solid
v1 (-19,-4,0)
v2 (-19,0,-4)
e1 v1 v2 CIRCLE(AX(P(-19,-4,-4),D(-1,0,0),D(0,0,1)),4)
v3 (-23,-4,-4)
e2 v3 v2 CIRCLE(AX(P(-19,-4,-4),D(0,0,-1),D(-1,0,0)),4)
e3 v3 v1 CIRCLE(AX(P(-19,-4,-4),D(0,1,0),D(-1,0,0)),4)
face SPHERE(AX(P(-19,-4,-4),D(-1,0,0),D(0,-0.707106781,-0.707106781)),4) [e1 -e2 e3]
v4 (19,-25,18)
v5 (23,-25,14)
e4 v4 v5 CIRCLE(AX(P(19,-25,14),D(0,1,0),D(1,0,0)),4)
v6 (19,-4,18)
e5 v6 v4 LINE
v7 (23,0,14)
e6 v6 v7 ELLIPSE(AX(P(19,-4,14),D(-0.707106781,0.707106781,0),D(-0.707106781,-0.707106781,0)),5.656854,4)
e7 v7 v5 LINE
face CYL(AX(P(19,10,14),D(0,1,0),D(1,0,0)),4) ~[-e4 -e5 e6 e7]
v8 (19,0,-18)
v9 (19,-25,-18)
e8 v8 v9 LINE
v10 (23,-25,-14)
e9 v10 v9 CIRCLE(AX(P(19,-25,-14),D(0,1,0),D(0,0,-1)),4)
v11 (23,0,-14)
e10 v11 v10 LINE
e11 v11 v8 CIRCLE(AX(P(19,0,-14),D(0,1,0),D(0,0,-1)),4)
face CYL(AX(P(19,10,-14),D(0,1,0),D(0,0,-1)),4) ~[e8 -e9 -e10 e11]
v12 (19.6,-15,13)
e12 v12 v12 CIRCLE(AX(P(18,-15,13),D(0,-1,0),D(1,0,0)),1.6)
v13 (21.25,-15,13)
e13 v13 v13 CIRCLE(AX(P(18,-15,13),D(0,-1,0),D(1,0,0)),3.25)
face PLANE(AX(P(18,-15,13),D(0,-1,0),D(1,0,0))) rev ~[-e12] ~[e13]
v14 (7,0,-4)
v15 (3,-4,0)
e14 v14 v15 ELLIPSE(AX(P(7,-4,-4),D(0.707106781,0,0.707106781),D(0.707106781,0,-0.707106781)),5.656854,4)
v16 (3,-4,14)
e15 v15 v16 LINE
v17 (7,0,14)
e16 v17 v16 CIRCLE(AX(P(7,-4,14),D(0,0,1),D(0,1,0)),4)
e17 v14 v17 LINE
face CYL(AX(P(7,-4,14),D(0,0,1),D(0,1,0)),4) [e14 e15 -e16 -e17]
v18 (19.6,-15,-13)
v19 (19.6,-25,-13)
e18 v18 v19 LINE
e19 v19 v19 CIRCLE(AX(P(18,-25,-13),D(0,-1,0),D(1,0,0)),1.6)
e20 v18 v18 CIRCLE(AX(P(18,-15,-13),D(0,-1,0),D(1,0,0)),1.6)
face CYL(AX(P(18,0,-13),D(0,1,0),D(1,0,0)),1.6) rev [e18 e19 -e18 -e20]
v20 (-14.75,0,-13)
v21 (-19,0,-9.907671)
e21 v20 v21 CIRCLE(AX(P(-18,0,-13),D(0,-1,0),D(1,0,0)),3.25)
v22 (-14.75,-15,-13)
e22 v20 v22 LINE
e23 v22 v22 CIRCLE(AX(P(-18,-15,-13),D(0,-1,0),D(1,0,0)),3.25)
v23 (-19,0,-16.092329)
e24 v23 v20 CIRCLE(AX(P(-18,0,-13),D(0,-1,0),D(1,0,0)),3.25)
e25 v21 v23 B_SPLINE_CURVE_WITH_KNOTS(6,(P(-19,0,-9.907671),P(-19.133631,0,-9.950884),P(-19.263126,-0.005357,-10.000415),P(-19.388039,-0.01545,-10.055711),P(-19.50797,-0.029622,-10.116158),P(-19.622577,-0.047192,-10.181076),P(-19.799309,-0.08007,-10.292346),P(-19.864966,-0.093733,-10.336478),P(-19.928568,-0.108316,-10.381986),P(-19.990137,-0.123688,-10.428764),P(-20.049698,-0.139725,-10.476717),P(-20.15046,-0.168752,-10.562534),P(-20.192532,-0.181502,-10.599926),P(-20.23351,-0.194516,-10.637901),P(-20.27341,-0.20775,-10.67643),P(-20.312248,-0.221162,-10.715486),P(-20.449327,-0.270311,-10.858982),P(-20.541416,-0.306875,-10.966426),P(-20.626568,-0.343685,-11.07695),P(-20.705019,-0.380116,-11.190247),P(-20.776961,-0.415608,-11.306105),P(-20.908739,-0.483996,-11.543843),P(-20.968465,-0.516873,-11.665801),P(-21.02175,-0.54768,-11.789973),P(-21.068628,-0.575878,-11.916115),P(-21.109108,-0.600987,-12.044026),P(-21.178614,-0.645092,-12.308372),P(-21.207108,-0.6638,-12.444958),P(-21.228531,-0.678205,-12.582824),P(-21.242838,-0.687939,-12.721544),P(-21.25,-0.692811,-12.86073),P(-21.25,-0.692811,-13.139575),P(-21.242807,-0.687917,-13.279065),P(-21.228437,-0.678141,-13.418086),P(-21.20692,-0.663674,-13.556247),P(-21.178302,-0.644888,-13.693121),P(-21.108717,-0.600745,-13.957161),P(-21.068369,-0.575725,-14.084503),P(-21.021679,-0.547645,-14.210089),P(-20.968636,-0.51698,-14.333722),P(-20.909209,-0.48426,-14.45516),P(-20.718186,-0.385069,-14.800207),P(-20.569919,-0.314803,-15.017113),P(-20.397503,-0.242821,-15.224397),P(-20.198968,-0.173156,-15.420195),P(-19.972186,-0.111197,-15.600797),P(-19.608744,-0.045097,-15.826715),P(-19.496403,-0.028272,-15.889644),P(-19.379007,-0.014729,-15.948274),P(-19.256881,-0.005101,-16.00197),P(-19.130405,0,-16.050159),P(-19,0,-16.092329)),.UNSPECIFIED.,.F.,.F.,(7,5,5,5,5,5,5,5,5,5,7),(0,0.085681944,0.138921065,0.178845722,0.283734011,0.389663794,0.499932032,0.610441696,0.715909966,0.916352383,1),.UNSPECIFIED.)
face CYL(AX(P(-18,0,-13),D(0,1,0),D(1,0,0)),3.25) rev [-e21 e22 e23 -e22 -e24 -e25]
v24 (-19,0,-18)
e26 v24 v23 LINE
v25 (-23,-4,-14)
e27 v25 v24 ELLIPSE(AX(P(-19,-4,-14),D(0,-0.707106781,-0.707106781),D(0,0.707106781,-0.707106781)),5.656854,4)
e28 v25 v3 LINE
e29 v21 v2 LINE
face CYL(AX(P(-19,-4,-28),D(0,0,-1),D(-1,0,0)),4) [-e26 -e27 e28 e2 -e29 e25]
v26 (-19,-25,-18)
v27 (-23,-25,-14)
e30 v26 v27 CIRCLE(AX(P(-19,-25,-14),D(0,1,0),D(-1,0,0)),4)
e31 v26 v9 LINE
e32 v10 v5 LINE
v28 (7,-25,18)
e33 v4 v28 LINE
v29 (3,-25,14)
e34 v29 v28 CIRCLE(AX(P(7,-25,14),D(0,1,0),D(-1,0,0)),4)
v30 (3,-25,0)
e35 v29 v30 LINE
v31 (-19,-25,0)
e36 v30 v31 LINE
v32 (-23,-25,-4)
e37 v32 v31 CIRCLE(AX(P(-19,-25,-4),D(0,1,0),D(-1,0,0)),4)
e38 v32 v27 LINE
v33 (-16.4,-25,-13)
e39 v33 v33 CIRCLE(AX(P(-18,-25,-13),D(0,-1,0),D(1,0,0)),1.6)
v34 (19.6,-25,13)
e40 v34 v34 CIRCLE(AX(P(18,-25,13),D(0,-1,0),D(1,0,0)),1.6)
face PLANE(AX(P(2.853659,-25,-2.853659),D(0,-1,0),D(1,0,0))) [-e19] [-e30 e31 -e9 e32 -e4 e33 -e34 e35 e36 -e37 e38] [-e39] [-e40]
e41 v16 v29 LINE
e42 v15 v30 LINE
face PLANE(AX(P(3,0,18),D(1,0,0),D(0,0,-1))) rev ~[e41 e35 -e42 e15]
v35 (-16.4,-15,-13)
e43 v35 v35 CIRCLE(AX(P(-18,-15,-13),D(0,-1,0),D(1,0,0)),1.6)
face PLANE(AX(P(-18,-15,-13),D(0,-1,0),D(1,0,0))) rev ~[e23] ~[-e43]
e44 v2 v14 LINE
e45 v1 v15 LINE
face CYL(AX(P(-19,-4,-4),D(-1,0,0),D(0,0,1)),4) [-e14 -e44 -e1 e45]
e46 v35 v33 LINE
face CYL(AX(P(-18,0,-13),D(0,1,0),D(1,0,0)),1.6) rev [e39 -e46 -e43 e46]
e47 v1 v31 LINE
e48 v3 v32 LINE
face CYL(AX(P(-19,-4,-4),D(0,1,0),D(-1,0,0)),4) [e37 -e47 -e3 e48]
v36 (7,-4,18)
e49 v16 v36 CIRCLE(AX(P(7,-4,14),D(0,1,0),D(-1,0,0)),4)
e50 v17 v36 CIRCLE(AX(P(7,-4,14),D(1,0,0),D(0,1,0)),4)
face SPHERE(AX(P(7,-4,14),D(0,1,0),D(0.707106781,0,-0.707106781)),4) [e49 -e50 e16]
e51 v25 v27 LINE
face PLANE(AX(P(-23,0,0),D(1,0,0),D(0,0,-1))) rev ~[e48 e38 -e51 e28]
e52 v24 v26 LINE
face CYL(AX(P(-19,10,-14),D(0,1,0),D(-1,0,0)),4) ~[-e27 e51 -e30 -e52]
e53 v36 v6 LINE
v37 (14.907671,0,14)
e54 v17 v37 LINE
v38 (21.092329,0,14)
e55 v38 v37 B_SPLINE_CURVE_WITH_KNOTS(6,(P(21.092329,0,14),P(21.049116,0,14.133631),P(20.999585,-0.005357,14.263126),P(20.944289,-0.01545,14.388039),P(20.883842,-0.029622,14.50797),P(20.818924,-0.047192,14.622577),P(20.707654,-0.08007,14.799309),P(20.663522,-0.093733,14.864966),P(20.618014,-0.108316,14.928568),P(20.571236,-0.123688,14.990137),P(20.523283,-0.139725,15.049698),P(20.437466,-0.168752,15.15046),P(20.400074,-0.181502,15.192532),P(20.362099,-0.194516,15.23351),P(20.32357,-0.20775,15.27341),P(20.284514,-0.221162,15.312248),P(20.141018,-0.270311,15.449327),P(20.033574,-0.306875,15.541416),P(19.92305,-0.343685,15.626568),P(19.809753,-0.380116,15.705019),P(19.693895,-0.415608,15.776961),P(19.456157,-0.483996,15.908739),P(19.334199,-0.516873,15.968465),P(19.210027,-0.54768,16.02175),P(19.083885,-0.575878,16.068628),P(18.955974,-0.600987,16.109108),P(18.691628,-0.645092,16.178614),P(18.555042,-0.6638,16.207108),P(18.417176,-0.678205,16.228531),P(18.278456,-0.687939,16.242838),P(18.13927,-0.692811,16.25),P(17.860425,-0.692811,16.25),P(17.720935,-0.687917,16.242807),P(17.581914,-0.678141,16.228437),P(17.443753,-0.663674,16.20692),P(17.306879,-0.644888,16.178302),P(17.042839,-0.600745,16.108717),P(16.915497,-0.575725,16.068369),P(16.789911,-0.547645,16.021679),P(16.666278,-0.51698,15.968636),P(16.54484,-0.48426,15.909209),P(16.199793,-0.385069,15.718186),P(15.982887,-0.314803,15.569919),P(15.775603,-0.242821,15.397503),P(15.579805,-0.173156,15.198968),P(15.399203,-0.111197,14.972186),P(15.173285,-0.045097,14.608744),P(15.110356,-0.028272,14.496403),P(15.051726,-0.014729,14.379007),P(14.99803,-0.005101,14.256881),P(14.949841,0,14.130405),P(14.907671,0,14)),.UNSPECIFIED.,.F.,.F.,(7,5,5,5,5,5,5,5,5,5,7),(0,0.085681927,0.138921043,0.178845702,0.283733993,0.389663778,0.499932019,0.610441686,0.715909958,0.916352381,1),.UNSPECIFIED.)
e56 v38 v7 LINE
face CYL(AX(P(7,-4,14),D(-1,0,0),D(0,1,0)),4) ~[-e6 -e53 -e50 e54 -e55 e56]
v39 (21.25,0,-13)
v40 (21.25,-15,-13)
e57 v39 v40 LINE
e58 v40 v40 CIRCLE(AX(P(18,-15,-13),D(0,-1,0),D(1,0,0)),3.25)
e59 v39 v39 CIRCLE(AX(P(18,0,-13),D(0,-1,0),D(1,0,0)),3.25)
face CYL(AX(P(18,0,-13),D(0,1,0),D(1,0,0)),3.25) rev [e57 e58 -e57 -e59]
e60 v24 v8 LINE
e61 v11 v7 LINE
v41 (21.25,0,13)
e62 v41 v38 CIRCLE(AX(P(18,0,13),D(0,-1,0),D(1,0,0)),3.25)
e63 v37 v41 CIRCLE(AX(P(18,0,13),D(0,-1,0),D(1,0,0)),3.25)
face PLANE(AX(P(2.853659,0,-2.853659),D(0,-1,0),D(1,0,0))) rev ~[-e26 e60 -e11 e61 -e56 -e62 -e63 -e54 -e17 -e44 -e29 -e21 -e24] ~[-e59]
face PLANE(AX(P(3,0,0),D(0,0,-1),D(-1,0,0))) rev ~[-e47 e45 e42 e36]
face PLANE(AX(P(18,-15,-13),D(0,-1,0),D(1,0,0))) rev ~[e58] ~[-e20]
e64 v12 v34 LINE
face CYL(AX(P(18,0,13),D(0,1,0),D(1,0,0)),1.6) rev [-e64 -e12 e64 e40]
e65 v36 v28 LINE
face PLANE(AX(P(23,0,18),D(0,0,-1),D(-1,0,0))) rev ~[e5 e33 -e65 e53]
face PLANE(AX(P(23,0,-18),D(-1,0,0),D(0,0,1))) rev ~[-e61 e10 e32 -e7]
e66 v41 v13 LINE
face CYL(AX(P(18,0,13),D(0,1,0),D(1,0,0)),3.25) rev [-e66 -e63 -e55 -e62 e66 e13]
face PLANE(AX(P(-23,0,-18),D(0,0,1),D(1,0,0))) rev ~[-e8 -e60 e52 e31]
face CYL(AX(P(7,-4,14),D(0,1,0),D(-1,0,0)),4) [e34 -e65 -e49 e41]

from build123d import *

# Parameters (mm, degrees)
F0_R         = 3.25
F0_R_2       = 1.6
F1_DEPTH     = 25
F2_DEPTH     = 15
F3_T1_DEPTH  = 24
F3_T3_DEPTH  = 22
F3_T5_DEPTH  = 14
F3_T7_DEPTH  = 26
F3_T9_DEPTH  = 31
F3_T11_DEPTH = 45
F3_S15_W     = 4
F3_S15_H     = 4
F3_T16_DEPTH = 4
F3_S21_W     = 4
F3_S21_H     = 4
F3_T22_DEPTH = 4
F3_T29_DEPTH = 32
F3_T33_DEPTH = 24


# Not quite as in the source:
# - a fillet or chamfer that OpenCascade refuses, or shapes differently, is made with other operations: its cross-section is extruded or revolved along the edge and cut away or added


with BuildPart() as f1:
    # F0 (on Front) → F1 (new body)
    with BuildSketch(Plane.XZ):
        Polygon((-23, 0), (-23, -18), (23, -18), (23, 18), (3, 18), (3, 0), align=None)
        with Locations((-18, -13)):
            Circle(F0_R, mode=Mode.SUBTRACT)
        with Locations((18, -13)):
            Circle(F0_R, mode=Mode.SUBTRACT)
        with Locations((18, 13)):
            Circle(F0_R, mode=Mode.SUBTRACT)
        with Locations((18, 13)):
            Circle(F0_R)
        with Locations((18, 13)):
            Circle(F0_R_2, mode=Mode.SUBTRACT)
        with Locations((18, -13)):
            Circle(F0_R)
        with Locations((18, -13)):
            Circle(F0_R_2, mode=Mode.SUBTRACT)
        with Locations((-18, -13)):
            Circle(F0_R)
        with Locations((-18, -13)):
            Circle(F0_R_2, mode=Mode.SUBTRACT)
    extrude(amount=F1_DEPTH)

    # F0 (on Front) → F2 (cut)
    with BuildSketch(Plane.XZ):
        with Locations((18, -13)):
            Circle(F0_R)
        with Locations((18, -13)):
            Circle(F0_R_2, mode=Mode.SUBTRACT)
        with Locations((-18, -13)):
            Circle(F0_R)
        with Locations((-18, -13)):
            Circle(F0_R_2, mode=Mode.SUBTRACT)
        with Locations((18, 13)):
            Circle(F0_R)
        with Locations((18, 13)):
            Circle(F0_R_2, mode=Mode.SUBTRACT)
    extrude(amount=F2_DEPTH, mode=Mode.SUBTRACT)

    # F3: fillet of radius 4 on 9 edges, made by hand

    # F3_s2 → F3_t1 (cut)
    with BuildSketch(Plane.XY.offset(-28)):
        with BuildLine():
            ThreePointArc((-23, -4), (-21.8284271247, -1.1715728753), (-19, 0))
            Line((-19, 0), (-23, 0))
            Line((-23, 0), (-23, -4))
        make_face()
    extrude(amount=F3_T1_DEPTH, mode=Mode.SUBTRACT)

    # F3_s4 → F3_t3 (cut)
    with BuildSketch(Plane.YZ.offset(-19)):
        with BuildLine():
            ThreePointArc((-4, 0), (-1.1715728753, -1.1715728753), (0, -4))
            Line((0, -4), (0, 0))
            Line((0, 0), (-4, 0))
        make_face()
    extrude(amount=F3_T3_DEPTH, mode=Mode.SUBTRACT)

    # F3_s6 → F3_t5 (cut)
    with BuildSketch(Plane.XY):
        with BuildLine():
            ThreePointArc((7, 0), (4.1715728753, -1.1715728753), (3, -4))
            Line((3, -4), (3, 0))
            Line((3, 0), (7, 0))
        make_face()
    extrude(amount=F3_T5_DEPTH, mode=Mode.SUBTRACT)

    # F3_s8 → F3_t7 (cut)
    with BuildSketch(Plane.YZ.offset(7)):
        with BuildLine():
            ThreePointArc((0, 14), (-1.1715728753, 16.8284271247), (-4, 18))
            Line((-4, 18), (0, 18))
            Line((0, 18), (0, 14))
        make_face()
    extrude(amount=F3_T7_DEPTH, mode=Mode.SUBTRACT)

    # F3_s10 → F3_t9 (cut)
    with BuildSketch(Plane.XZ.offset(4)):
        with BuildLine():
            ThreePointArc((-23, -4), (-21.8284271247, -1.1715728753), (-19, 0))
            Line((-19, 0), (-23, 0))
            Line((-23, 0), (-23, -4))
        make_face()
        with BuildLine():
            ThreePointArc((3, 14), (4.1715728753, 16.8284271247), (7, 18))
            Line((7, 18), (3, 18))
            Line((3, 18), (3, 14))
        make_face()
    extrude(amount=F3_T9_DEPTH, mode=Mode.SUBTRACT)

    # F3_s12 → F3_t11 (cut)
    with BuildSketch(Plane.XZ.offset(-10)):
        with BuildLine():
            ThreePointArc((-23, -14), (-21.8284271247, -16.8284271247), (-19, -18))
            Line((-19, -18), (-23, -18))
            Line((-23, -18), (-23, -14))
        make_face()
        with BuildLine():
            ThreePointArc((19, -18), (21.8284271247, -16.8284271247), (23, -14))
            Line((23, -14), (23, -18))
            Line((23, -18), (19, -18))
        make_face()
        with BuildLine():
            ThreePointArc((23, 14), (21.8284271247, 16.8284271247), (19, 18))
            Line((19, 18), (23, 18))
            Line((23, 18), (23, 14))
        make_face()
    extrude(amount=F3_T11_DEPTH, mode=Mode.SUBTRACT)


with BuildPart() as f3_tool14:
    # F3_s15 → F3_t16 (new body)
    with BuildSketch(Plane.YZ.offset(-19)):
        with Locations((-2, -2)):
            Rectangle(F3_S15_W, F3_S15_H)
    extrude(amount=-F3_T16_DEPTH)

    # F3_s17 → F3_t18 (revolve, cut)
    with BuildSketch(Plane(origin=(-19, -4, -4), x_dir=(0, -0.7071067812, -0.7071067812), z_dir=(0, 0.7071067812, -0.7071067812))):
        with BuildLine():
            ThreePointArc((0, -4), (4, 0), (0, 4))
            Line((0, 4), (0, -4))
        make_face()
    revolve(axis=Axis((-19, -4, -4), (-1, 0, 0)), mode=Mode.SUBTRACT)


with BuildPart() as f1_1:
    add(f1.part)

    # F3_t13: cut F3_tool14
    add(f3_tool14.part, mode=Mode.SUBTRACT)


with BuildPart() as f3_tool20:
    # F3_s21 → F3_t22 (new body)
    with BuildSketch(Plane.XZ.offset(4)):
        with Locations((5, 16)):
            Rectangle(F3_S21_W, F3_S21_H)
    extrude(amount=-F3_T22_DEPTH)

    # F3_s23 → F3_t24 (revolve, cut)
    with BuildSketch(Plane(origin=(7, -4, 14), x_dir=(0.7071067812, 0, -0.7071067812), z_dir=(0.7071067812, 0, 0.7071067812))):
        with BuildLine():
            ThreePointArc((0, -4), (4, 0), (0, 4))
            Line((0, 4), (0, -4))
        make_face()
    revolve(axis=Axis((7, -4, 14), (0, 1, 0)), mode=Mode.SUBTRACT)


with BuildPart() as f1_2:
    add(f1_1.part)

    # F3_t19: cut F3_tool20
    add(f3_tool20.part, mode=Mode.SUBTRACT)


with BuildPart() as f3_tool27:
    # F3_s28 → F3_t29 (new body)
    with BuildSketch(Plane.YZ.offset(13)):
        with BuildLine():
            ThreePointArc((-4, 0), (-1.1715728753, -1.1715728753), (0, -4))
            Line((0, -4), (0, 0))
            Line((0, 0), (-4, 0))
        make_face()
    extrude(amount=-F3_T29_DEPTH)

    split(bisect_by=Plane.YZ.offset(3), keep=Keep.TOP)


with BuildPart() as f3_tool31:
    # F3_s32 → F3_t33 (new body)
    with BuildSketch(Plane.XY.offset(14)):
        with BuildLine():
            ThreePointArc((7, 0), (4.1715728753, -1.1715728753), (3, -4))
            Line((3, -4), (3, 0))
            Line((3, 0), (7, 0))
        make_face()
    extrude(amount=-F3_T33_DEPTH)

    split(bisect_by=Plane.XY, keep=Keep.BOTTOM)


with BuildPart() as f3_tool27_1:
    add(f3_tool27.part)

    # F3_t35: intersect F3_tool31
    add(f3_tool31.part, mode=Mode.INTERSECT)


with BuildPart() as f1_3:
    add(f1_2.part)

    # F3_t25: cut F3_tool27
    add(f3_tool27_1.part, mode=Mode.SUBTRACT)


solid = f1_3.part
